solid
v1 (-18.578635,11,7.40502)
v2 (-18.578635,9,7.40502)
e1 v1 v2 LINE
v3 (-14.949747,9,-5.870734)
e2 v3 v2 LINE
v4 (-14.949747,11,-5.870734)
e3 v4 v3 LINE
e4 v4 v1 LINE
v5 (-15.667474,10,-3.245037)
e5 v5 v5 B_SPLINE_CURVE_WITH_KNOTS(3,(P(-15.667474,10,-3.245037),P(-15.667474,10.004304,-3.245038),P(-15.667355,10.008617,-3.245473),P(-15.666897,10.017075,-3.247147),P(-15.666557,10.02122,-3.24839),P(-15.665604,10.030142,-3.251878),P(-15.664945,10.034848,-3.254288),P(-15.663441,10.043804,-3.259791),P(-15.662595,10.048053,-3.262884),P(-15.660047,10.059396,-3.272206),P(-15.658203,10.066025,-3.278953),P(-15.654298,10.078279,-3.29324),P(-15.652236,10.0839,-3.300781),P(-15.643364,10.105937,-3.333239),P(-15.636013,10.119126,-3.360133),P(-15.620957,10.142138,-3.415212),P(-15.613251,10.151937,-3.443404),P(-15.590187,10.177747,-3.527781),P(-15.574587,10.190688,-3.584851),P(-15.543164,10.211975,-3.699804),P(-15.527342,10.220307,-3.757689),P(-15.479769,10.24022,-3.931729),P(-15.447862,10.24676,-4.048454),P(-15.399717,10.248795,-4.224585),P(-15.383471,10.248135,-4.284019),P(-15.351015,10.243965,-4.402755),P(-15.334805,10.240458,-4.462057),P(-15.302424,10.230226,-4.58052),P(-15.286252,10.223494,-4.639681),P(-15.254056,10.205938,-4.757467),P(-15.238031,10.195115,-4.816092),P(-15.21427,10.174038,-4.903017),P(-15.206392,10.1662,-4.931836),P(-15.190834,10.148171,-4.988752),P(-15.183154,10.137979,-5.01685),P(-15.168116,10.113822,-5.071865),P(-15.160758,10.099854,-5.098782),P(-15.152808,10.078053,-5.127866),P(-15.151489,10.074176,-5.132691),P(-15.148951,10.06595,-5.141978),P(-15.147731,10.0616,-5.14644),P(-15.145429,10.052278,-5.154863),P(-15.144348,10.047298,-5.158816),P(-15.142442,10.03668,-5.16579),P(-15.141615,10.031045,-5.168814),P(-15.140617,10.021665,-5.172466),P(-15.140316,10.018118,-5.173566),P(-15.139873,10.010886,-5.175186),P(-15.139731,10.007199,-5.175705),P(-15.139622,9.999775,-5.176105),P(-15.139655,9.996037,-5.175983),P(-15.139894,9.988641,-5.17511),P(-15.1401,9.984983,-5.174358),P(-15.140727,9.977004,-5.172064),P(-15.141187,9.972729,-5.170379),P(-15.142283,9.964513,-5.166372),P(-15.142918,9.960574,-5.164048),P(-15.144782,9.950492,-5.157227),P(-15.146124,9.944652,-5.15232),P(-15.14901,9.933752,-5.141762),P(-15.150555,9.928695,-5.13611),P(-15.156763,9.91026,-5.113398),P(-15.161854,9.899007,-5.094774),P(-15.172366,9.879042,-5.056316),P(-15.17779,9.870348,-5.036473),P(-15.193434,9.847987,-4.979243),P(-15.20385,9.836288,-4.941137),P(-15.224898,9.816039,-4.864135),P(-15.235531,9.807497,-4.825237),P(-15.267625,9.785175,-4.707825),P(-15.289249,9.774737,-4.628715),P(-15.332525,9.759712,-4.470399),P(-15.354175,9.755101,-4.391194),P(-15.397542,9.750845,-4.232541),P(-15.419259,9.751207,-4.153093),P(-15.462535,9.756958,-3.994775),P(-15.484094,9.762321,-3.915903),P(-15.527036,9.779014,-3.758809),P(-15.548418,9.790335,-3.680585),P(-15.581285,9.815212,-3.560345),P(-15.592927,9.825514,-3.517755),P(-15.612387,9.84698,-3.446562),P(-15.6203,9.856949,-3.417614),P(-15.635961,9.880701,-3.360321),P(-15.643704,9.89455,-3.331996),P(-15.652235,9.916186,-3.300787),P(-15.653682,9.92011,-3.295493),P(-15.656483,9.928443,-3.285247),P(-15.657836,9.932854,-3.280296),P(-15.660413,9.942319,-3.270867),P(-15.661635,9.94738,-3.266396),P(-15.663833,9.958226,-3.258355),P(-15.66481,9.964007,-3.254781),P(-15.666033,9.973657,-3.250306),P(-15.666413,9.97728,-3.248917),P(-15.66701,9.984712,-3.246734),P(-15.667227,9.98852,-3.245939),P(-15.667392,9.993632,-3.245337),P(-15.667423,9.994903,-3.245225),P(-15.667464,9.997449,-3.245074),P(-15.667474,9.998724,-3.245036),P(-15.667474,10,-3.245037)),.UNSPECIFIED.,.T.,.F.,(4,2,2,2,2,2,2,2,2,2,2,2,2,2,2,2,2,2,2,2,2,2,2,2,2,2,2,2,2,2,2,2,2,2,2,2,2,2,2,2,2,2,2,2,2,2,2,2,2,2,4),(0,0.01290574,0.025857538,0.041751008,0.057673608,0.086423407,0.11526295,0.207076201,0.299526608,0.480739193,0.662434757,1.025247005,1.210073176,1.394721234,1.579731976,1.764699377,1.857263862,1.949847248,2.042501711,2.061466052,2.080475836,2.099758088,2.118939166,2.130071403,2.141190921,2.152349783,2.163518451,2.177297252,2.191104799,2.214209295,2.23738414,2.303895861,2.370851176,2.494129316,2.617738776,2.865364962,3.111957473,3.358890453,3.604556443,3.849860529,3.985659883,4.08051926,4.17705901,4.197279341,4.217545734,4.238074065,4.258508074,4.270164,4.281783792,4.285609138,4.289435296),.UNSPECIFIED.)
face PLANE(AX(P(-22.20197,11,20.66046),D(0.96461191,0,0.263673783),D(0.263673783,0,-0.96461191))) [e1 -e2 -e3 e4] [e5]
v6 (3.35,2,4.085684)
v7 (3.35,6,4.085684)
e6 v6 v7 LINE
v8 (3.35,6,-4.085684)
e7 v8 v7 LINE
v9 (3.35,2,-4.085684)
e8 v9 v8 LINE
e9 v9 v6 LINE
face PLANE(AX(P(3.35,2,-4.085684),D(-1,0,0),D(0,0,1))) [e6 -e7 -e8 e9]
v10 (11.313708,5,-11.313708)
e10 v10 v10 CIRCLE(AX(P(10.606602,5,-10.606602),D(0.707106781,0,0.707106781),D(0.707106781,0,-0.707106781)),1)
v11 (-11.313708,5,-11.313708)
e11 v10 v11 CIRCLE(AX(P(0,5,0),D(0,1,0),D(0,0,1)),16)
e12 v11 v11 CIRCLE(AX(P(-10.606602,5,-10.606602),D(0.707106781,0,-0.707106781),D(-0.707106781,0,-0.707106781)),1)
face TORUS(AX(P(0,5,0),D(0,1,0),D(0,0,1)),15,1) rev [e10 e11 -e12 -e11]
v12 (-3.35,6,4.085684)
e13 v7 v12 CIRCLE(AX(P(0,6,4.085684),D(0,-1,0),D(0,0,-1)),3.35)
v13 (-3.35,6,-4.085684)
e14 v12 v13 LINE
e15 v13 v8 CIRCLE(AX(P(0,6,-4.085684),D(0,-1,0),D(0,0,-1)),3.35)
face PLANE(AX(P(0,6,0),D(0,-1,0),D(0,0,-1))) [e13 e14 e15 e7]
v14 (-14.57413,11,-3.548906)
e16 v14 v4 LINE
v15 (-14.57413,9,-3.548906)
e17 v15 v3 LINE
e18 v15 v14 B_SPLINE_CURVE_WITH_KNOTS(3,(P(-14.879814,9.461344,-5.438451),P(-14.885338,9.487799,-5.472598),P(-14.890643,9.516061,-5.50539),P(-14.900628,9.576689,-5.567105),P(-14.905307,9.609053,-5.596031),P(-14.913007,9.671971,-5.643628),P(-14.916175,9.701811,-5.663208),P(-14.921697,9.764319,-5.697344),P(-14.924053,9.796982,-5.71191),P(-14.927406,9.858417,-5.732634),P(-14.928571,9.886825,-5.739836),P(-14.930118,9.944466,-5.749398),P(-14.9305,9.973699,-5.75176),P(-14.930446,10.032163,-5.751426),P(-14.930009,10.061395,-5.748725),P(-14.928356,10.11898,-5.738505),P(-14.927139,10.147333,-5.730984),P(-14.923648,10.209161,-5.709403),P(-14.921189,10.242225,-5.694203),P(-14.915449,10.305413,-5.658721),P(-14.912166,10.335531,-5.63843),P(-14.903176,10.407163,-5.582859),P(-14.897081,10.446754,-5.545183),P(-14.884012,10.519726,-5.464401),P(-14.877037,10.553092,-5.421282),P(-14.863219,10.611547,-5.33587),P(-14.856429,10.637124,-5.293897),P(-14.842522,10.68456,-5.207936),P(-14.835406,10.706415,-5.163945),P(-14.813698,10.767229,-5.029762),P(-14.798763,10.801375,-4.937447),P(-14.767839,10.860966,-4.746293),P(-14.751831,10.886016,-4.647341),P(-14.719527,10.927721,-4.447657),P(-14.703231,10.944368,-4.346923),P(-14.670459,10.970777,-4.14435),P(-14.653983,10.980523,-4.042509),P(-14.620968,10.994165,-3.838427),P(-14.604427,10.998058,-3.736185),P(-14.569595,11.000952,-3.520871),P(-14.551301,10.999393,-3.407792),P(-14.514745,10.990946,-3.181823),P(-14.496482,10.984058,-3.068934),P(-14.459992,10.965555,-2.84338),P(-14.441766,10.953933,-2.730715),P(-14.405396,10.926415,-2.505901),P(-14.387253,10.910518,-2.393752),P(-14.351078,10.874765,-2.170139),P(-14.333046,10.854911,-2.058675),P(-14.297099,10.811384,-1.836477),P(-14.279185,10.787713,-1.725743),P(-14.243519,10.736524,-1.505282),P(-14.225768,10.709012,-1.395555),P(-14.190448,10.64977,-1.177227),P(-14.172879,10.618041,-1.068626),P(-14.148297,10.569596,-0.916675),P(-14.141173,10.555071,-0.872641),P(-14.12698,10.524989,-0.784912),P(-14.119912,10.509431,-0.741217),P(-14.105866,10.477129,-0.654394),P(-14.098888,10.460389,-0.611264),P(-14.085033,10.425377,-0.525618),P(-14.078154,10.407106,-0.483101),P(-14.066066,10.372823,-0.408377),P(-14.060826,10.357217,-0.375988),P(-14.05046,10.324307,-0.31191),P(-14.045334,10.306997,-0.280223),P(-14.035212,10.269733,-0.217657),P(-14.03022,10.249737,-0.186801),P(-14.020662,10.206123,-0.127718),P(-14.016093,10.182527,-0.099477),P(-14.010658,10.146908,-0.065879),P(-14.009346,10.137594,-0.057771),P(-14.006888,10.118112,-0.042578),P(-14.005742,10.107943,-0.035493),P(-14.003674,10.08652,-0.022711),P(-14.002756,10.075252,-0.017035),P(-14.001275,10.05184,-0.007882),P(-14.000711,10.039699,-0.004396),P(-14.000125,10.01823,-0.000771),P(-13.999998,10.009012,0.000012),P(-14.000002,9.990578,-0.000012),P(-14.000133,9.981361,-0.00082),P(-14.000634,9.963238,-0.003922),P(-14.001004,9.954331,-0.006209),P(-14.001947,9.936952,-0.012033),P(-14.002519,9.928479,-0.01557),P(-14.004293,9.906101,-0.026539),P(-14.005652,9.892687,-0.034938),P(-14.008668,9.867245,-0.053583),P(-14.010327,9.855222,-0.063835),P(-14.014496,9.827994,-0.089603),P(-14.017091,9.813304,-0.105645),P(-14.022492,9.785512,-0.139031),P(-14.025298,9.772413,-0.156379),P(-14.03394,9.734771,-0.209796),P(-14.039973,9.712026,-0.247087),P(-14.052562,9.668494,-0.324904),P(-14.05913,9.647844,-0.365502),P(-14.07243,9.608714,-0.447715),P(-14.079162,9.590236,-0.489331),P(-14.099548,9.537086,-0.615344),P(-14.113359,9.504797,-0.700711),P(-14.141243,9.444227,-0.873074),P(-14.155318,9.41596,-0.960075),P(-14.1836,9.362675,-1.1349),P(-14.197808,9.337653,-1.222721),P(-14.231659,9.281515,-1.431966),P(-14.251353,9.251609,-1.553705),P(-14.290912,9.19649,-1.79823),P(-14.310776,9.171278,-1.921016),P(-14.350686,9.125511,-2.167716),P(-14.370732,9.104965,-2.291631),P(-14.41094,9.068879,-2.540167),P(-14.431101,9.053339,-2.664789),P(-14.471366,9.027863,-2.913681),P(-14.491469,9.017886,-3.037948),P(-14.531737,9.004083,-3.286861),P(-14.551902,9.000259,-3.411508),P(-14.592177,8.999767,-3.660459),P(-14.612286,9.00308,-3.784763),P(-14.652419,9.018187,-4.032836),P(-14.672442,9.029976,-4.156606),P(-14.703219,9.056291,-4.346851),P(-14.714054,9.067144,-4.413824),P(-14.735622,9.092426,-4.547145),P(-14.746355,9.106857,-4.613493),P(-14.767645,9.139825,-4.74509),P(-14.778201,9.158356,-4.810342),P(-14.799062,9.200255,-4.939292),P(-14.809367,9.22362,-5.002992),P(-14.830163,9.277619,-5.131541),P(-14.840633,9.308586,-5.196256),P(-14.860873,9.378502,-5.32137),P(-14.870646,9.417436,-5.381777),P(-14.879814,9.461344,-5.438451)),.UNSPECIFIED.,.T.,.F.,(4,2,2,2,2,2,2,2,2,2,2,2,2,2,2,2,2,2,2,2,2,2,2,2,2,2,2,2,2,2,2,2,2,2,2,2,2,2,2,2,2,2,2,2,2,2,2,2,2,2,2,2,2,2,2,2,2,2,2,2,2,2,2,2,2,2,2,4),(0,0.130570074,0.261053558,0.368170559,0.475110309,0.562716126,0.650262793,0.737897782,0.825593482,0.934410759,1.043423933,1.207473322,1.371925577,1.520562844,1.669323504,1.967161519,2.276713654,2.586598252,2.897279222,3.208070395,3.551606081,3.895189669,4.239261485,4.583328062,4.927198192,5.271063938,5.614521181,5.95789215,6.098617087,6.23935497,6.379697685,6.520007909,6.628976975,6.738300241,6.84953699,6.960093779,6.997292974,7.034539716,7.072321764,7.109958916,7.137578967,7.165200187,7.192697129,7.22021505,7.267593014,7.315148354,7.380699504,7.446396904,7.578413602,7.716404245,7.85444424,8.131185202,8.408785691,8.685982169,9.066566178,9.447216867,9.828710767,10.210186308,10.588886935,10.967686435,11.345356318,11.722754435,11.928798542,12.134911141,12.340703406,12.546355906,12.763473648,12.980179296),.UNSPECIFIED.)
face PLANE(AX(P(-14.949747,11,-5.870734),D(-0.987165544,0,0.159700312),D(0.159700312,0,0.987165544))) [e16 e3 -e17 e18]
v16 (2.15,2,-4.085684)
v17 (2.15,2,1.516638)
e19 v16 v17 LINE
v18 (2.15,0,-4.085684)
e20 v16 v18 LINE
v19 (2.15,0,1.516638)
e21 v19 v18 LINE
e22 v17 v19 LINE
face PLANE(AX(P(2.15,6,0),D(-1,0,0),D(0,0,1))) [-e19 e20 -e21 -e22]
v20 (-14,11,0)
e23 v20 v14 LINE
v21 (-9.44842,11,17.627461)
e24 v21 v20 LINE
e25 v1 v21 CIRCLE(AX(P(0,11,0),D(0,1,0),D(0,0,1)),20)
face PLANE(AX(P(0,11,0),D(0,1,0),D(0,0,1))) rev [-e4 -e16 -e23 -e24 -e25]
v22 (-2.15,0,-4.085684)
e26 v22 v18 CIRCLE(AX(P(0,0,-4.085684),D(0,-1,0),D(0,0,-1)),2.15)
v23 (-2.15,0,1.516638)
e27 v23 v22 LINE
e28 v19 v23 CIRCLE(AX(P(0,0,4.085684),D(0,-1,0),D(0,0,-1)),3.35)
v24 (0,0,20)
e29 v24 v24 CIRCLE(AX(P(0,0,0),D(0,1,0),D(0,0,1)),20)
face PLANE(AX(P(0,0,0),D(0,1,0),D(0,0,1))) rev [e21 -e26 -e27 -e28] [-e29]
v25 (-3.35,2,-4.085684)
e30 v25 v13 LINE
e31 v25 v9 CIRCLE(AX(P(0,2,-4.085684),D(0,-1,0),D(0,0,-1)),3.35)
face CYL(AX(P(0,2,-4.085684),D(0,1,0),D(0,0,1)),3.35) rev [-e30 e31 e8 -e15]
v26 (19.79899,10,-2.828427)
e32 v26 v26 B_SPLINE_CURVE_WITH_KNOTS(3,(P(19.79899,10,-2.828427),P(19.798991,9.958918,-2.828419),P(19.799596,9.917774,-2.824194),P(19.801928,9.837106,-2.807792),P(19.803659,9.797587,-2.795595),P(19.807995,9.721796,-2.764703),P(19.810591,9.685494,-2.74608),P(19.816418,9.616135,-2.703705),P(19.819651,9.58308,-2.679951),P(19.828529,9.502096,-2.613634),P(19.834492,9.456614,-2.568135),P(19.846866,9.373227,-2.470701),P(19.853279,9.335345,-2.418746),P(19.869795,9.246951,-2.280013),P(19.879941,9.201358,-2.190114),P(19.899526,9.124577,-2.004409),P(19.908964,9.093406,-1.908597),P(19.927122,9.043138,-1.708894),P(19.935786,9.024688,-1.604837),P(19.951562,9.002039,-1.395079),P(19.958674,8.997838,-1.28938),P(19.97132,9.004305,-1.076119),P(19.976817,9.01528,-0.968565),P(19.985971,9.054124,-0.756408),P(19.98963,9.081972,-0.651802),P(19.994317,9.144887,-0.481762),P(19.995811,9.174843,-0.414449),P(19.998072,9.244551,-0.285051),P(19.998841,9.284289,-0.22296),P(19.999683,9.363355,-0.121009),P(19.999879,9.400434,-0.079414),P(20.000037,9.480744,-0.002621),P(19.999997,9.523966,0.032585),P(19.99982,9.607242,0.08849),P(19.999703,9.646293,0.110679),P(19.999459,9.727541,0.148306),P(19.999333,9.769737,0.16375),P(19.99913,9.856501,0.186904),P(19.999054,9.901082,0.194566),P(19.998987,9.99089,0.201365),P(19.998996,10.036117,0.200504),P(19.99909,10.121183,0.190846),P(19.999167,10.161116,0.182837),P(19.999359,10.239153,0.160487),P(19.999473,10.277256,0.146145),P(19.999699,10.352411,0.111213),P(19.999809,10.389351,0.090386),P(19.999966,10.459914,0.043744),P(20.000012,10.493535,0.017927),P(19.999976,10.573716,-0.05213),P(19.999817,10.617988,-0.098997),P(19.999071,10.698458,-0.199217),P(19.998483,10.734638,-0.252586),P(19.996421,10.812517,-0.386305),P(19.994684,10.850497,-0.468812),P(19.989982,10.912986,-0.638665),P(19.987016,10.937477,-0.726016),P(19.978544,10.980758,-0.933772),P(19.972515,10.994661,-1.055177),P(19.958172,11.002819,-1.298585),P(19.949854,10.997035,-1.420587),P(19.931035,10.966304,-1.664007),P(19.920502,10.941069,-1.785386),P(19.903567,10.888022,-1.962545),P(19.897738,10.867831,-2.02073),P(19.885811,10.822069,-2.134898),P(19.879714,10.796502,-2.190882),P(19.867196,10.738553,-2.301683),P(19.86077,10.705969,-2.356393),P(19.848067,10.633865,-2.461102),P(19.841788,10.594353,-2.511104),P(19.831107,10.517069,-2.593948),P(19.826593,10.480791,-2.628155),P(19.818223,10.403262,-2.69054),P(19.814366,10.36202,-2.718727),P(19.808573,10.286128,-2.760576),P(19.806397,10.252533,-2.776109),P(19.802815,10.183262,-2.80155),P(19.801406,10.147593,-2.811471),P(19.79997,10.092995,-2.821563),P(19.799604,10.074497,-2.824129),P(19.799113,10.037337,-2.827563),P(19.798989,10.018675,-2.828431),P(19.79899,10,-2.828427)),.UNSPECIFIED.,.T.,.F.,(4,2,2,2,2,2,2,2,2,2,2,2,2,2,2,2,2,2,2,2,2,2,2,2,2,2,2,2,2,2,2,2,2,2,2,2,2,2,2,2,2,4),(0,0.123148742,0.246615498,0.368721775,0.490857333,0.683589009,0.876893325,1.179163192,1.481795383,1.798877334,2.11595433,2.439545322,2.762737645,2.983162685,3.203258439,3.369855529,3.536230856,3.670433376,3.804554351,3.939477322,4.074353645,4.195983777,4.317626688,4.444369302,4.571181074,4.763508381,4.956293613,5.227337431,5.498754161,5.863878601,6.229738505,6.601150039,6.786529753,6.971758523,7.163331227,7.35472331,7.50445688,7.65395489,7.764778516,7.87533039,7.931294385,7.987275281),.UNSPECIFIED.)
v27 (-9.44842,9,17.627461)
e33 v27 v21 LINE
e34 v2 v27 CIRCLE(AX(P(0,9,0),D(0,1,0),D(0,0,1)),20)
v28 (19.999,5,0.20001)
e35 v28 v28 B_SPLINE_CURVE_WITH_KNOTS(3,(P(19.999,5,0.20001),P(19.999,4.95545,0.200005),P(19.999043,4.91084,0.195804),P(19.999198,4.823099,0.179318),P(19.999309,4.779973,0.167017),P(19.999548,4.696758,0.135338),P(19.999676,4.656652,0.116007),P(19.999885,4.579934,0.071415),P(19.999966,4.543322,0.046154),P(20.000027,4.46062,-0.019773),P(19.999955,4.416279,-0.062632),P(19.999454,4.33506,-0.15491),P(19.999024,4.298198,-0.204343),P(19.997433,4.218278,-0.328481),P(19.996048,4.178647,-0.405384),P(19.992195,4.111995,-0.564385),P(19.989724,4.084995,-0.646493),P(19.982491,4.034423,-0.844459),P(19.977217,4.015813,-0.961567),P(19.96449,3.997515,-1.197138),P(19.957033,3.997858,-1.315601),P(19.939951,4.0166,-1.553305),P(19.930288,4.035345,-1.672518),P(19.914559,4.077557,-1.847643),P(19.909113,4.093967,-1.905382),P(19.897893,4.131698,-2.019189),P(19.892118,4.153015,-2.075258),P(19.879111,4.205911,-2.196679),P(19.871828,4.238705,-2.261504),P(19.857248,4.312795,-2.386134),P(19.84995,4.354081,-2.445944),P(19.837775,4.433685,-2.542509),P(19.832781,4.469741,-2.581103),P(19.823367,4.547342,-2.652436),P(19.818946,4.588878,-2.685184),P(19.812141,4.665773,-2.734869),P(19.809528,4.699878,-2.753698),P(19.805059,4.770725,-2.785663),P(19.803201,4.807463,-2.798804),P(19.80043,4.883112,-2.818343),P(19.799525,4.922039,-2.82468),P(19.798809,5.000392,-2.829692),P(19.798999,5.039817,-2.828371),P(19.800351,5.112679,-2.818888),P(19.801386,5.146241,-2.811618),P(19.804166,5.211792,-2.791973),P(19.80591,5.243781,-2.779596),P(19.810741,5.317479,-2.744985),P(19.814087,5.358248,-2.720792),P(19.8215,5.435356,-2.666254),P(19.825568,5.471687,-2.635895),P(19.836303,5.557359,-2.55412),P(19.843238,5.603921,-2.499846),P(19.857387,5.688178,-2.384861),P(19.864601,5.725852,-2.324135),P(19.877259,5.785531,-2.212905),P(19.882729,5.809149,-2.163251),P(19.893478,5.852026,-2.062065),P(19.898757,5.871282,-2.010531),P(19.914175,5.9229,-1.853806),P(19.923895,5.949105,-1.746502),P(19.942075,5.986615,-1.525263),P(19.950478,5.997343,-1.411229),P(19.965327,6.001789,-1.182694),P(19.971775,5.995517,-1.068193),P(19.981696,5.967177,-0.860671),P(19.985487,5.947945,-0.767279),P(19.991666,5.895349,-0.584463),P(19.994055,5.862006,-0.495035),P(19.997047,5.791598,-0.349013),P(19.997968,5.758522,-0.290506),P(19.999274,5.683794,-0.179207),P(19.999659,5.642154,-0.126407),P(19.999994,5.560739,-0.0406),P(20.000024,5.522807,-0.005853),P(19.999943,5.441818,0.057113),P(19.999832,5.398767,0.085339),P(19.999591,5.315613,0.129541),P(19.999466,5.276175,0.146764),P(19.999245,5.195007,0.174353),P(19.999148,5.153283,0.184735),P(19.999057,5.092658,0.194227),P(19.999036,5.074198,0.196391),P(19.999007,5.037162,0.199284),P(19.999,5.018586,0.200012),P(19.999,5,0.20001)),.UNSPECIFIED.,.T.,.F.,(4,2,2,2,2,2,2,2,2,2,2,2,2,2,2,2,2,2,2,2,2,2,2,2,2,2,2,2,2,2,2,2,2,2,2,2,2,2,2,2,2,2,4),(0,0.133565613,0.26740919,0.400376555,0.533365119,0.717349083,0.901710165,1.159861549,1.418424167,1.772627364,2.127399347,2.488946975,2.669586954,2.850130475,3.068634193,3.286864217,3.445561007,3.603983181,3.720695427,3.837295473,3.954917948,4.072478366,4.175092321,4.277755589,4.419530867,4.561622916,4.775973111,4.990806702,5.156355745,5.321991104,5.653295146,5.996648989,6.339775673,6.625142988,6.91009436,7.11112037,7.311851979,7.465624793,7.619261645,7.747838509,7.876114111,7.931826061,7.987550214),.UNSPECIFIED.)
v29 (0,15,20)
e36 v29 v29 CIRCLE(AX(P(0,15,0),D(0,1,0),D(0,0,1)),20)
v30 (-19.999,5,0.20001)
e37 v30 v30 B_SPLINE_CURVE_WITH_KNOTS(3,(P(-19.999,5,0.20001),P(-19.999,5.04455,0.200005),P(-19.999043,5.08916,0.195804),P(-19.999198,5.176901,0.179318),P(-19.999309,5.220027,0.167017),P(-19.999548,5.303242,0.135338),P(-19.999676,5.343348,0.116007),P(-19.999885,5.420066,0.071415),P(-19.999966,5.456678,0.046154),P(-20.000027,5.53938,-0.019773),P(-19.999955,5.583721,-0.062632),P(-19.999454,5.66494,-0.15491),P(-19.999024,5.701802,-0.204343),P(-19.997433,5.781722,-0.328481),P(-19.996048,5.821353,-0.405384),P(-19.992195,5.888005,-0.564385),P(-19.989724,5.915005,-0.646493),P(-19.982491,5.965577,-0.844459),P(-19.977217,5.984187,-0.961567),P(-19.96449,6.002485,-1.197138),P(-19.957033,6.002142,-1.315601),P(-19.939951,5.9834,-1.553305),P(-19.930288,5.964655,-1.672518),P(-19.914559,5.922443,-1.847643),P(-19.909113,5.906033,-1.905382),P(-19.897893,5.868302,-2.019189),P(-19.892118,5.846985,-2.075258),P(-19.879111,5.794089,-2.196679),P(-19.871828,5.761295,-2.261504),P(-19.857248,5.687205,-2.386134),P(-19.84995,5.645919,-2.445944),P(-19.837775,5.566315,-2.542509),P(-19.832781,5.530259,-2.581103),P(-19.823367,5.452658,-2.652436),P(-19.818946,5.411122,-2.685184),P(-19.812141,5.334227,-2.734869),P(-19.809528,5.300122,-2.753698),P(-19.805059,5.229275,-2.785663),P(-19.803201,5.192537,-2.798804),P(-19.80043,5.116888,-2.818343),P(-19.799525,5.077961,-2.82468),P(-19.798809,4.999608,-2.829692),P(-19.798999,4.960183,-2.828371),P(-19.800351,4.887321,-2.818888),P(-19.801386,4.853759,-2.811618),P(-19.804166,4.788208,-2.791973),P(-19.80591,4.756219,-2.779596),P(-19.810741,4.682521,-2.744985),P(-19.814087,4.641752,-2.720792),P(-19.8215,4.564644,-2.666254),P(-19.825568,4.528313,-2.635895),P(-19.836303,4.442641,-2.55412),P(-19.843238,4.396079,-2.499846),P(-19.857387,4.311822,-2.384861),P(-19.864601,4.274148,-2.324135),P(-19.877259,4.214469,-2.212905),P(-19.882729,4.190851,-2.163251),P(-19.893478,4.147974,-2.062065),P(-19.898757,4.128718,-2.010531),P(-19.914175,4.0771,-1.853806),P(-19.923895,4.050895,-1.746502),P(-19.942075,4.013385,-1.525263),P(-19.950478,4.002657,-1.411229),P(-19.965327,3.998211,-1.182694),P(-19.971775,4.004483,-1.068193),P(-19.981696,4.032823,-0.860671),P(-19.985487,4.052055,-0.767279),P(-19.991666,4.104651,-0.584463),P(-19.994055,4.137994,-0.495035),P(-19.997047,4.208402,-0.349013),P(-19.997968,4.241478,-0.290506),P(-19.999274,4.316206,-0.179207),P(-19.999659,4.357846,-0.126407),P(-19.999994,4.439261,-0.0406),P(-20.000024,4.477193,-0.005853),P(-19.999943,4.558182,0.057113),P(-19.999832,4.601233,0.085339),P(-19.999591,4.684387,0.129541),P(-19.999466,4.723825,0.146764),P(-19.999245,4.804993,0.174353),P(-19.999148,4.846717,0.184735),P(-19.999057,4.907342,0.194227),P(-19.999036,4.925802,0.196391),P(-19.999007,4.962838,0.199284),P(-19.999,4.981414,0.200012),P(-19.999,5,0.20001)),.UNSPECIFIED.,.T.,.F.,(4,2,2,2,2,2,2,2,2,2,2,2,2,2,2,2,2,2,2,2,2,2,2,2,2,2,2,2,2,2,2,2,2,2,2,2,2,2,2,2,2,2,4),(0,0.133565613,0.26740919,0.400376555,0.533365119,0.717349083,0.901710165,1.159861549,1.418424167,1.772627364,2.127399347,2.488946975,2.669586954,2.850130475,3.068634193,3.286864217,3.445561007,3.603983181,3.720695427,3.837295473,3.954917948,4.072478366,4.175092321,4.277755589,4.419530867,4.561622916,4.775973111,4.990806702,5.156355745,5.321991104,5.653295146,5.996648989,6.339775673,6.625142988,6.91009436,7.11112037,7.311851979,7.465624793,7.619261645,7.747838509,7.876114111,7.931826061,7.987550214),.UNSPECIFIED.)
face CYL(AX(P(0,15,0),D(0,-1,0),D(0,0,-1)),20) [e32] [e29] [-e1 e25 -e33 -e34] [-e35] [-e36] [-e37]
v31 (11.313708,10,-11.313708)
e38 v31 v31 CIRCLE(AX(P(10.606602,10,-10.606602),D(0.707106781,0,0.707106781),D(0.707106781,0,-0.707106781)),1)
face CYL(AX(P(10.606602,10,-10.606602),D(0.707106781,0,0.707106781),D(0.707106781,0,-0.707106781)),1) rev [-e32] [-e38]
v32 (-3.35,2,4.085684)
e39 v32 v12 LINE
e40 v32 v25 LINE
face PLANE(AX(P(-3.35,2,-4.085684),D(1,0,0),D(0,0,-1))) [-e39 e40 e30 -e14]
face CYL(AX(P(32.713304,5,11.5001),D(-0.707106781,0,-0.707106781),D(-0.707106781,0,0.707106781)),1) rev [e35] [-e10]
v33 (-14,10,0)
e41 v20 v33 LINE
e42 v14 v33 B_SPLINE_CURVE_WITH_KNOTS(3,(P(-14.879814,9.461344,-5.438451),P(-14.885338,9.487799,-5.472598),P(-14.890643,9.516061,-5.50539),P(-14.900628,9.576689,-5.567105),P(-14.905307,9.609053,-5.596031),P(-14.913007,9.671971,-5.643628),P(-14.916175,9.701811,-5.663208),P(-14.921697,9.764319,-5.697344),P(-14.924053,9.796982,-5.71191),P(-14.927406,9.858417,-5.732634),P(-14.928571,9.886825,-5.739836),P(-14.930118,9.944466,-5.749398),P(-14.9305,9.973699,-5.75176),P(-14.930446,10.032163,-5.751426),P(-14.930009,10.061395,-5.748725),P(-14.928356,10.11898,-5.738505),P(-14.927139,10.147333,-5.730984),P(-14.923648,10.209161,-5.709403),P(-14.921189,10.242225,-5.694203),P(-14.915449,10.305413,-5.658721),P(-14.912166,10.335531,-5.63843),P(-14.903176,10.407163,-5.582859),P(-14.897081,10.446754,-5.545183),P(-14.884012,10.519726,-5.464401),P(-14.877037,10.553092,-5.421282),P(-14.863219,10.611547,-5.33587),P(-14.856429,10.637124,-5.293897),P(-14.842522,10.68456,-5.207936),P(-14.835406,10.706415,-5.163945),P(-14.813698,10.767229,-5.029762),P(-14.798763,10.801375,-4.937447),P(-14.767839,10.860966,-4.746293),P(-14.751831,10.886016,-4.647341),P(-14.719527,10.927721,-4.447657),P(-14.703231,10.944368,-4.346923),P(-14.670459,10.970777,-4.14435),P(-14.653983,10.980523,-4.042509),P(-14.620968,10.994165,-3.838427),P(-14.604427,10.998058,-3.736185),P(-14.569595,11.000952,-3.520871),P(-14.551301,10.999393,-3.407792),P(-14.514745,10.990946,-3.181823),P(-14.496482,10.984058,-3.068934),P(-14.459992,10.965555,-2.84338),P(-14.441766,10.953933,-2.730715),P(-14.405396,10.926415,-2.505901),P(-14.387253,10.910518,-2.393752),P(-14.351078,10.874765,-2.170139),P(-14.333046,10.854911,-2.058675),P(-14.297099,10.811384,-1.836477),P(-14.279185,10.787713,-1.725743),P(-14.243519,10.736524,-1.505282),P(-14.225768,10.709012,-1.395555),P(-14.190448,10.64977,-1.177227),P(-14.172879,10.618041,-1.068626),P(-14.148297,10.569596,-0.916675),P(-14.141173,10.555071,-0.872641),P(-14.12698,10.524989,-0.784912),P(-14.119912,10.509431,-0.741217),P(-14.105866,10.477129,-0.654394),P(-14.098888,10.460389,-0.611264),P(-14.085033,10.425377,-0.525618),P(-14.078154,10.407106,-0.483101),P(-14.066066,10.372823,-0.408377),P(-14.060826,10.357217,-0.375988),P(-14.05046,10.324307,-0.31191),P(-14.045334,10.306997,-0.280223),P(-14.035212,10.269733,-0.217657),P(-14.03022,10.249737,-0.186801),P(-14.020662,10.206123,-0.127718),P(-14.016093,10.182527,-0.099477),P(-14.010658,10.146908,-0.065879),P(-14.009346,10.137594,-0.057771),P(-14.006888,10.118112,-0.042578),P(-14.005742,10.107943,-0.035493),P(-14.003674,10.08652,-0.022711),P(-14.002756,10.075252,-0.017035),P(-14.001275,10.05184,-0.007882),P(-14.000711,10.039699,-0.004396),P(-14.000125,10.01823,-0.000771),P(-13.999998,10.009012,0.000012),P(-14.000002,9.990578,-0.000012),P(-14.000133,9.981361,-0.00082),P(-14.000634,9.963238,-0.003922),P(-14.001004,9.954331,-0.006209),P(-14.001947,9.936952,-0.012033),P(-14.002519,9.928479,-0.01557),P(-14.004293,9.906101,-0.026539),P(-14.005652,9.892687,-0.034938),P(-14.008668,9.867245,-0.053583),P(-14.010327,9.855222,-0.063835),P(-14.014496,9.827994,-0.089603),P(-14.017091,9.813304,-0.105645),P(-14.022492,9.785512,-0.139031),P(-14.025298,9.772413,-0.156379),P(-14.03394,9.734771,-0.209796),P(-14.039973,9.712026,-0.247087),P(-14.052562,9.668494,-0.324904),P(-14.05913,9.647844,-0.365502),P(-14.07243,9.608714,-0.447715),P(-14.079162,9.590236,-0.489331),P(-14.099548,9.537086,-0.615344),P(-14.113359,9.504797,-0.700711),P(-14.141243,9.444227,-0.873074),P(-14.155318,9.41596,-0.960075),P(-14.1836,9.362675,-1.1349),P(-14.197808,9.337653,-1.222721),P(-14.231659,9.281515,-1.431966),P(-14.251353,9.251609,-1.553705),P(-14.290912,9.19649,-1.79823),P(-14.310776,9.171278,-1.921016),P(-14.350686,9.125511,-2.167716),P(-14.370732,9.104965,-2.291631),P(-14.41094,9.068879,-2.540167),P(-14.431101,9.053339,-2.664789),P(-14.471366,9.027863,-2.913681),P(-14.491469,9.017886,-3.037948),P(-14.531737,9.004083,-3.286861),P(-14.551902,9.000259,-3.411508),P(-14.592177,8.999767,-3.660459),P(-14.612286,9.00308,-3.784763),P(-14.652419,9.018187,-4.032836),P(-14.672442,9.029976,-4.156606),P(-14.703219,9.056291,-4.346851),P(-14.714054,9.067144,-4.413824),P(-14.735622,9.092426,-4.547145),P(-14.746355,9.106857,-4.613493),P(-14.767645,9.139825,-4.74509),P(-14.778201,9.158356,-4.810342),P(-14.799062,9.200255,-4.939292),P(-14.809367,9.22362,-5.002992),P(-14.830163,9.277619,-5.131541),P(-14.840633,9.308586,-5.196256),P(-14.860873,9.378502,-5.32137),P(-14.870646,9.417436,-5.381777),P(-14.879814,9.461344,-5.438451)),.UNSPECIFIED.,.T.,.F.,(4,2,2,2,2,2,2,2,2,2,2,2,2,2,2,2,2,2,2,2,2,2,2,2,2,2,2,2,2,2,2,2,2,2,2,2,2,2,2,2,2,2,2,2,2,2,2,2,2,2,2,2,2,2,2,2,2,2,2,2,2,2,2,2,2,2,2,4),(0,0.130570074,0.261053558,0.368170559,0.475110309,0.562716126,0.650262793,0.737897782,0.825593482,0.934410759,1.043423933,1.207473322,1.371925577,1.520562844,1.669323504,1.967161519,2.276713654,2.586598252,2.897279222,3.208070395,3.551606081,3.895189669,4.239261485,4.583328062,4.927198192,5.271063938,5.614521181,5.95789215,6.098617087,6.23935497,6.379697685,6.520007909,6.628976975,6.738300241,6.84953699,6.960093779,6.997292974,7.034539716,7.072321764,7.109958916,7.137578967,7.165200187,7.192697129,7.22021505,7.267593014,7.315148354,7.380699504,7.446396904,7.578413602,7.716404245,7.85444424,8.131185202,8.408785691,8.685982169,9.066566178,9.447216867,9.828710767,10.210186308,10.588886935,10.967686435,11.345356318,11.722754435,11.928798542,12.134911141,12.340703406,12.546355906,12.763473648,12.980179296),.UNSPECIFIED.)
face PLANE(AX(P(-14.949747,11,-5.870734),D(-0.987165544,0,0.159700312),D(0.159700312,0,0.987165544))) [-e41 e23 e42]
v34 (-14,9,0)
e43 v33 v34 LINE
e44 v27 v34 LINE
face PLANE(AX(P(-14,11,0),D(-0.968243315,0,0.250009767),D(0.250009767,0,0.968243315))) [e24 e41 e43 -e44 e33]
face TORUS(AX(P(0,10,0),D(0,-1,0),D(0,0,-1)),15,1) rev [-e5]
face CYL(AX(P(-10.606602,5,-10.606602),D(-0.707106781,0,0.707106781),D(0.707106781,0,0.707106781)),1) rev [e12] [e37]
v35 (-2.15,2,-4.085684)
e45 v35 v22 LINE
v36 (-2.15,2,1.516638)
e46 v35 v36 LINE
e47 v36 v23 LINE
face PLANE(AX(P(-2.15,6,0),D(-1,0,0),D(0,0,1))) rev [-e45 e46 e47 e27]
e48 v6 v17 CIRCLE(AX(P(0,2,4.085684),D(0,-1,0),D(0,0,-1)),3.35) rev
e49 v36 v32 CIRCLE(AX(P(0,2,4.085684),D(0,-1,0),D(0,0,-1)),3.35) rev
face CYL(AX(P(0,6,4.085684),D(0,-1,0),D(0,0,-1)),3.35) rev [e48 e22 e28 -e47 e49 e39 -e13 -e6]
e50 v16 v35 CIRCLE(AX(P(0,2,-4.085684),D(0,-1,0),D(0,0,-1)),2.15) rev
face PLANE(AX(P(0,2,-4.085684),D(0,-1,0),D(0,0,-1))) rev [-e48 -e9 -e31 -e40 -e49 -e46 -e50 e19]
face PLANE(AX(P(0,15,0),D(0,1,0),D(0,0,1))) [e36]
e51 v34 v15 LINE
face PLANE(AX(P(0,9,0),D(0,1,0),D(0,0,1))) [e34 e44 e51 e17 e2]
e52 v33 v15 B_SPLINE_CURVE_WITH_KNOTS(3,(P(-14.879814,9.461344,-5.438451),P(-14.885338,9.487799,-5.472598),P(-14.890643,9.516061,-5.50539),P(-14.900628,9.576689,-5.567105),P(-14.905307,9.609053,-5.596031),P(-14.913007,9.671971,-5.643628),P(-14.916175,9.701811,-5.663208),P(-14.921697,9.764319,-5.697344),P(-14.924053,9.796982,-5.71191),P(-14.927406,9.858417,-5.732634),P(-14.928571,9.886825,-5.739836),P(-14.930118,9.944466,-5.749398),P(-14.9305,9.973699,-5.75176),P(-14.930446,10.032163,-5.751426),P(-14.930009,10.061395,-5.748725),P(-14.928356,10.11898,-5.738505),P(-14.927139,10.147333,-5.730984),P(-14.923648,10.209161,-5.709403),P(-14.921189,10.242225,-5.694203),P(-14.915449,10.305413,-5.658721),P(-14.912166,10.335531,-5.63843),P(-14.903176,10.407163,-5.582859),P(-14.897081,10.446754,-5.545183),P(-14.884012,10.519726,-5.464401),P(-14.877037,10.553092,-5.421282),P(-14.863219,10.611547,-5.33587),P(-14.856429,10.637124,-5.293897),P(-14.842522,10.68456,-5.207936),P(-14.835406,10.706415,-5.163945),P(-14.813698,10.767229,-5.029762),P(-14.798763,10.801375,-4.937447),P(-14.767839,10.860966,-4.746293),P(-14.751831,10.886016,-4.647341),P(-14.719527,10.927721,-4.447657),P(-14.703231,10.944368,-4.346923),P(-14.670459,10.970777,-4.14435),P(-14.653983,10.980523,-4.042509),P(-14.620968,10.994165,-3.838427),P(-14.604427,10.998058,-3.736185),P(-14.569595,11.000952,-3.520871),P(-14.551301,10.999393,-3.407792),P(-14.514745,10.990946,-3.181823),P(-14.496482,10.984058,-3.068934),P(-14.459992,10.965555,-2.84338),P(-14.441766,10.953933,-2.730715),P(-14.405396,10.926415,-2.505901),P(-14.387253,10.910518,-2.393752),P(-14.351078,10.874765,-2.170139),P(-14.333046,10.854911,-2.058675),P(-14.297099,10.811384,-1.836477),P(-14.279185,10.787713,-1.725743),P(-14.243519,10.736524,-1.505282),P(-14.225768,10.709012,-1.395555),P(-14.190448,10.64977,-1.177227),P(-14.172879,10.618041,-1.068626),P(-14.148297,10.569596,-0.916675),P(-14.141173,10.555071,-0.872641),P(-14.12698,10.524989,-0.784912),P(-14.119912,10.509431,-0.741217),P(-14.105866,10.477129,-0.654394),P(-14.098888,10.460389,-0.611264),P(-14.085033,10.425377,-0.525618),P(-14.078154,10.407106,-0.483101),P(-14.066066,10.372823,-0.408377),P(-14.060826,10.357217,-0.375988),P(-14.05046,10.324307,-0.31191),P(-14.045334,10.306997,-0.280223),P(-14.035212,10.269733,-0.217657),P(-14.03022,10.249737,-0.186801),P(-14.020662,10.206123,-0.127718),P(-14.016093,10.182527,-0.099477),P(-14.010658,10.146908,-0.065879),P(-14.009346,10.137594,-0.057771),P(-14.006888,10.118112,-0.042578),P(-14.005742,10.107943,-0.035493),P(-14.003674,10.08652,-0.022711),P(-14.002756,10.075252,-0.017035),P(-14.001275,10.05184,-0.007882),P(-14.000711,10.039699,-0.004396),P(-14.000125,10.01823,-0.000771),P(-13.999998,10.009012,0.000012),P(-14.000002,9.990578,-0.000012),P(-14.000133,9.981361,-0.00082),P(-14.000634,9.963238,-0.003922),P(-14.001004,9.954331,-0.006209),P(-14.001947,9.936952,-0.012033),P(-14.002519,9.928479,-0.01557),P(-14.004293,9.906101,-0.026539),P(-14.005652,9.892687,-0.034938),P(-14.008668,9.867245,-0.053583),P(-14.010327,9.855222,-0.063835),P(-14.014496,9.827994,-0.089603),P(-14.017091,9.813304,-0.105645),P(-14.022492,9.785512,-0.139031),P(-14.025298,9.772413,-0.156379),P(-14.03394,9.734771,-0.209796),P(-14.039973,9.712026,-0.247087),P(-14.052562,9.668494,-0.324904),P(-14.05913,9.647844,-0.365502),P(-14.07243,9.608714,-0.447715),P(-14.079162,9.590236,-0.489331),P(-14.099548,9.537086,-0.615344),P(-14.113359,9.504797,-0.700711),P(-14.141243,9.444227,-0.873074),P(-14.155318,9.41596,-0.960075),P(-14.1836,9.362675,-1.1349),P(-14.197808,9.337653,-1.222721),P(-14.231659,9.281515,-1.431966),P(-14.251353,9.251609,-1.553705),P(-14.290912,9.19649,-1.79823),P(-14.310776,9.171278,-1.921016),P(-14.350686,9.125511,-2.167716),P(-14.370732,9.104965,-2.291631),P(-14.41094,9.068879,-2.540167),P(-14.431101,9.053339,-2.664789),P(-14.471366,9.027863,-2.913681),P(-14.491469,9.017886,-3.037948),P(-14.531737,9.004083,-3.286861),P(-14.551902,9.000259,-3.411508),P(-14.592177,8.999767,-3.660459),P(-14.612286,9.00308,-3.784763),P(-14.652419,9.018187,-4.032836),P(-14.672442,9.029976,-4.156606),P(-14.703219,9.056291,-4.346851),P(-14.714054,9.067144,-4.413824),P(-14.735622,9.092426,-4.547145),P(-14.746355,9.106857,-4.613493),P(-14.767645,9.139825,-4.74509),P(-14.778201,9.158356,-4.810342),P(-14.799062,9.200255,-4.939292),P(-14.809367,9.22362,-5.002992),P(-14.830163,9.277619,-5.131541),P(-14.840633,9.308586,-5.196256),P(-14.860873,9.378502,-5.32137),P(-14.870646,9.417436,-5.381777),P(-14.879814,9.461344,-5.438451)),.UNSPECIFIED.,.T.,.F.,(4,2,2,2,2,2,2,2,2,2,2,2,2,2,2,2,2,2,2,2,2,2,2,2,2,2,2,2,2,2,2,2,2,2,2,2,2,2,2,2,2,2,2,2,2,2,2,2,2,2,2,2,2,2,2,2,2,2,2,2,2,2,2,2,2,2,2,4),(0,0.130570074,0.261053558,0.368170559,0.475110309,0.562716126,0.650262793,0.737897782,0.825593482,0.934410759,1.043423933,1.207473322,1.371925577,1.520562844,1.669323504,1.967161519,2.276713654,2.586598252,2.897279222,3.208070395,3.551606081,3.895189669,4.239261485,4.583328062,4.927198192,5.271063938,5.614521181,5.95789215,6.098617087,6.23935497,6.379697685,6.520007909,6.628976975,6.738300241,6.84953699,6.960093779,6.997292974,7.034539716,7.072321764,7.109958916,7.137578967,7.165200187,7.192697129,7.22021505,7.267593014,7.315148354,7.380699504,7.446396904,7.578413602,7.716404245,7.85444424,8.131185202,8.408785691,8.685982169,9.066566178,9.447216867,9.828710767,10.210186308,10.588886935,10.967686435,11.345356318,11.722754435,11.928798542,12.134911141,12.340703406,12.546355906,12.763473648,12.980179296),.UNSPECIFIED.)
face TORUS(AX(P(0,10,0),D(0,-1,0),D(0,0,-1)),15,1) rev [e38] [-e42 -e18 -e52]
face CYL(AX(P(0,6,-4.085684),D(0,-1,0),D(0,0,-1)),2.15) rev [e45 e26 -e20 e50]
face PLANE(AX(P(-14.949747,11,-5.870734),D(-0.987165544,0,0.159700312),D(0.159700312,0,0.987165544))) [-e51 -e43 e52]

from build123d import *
from build123d.topology import SkipClean

# Parameters (mm, degrees)
SKETCH1_R               = 20
BOSS_EXTRUDE1_DEPTH     = 15
CUT_EXTRUDE1_DEPTH      = 6
CUT_EXTRUDE2_START      = 4
CUT_EXTRUDE2_DEPTH      = 4
CUT_SWEEP1_PROFILE_R    = 1
CUT_SWEEP2_PROFILE_R    = 1
CUT_EXTRUDE3_DEPTH      = 1
CUT_EXTRUDE3_DEPTH_BACK = 1


with BuildPart() as part:
    # Sketch1 → Boss-Extrude1 (new body)
    with BuildSketch(Plane(origin=(0, 0, 0), x_dir=(1, 0, 0), z_dir=(0, 1, 0))):
        Circle(SKETCH1_R)
    extrude(amount=BOSS_EXTRUDE1_DEPTH)

    # Sketch2 → Cut-Extrude1 (cut)
    with BuildSketch(Plane.XZ):
        with BuildLine():
            Line((-2.15, 1.516637572), (-2.15, -4.085684088))
            ThreePointArc((-2.15, -4.085684088), (0, -6.235684088), (2.15, -4.085684088))
            Line((2.15, -4.085684088), (2.15, 1.516637572))
            ThreePointArc((2.15, 1.516637572), (0, 7.435684088), (-2.15, 1.516637572))
        make_face()
    extrude(amount=-CUT_EXTRUDE1_DEPTH, mode=Mode.SUBTRACT)

    # Sketch3 → Cut-Extrude2 (cut)
    with SkipClean():  # the faces are left unmerged after this step: merging them gives an invalid solid
        with BuildSketch(Plane.XZ.offset(-6).offset(CUT_EXTRUDE2_START)):
            with BuildLine():
                Line((-3.35, -4.085684088), (-3.35, 4.085684088))
                ThreePointArc((-3.35, 4.085684088), (0, 7.435684088), (3.35, 4.085684088))
                Line((3.35, 4.085684088), (3.35, -4.085684088))
                ThreePointArc((3.35, -4.085684088), (0, -7.435684088), (-3.35, -4.085684088))
            make_face()
        extrude(amount=-CUT_EXTRUDE2_DEPTH, mode=Mode.SUBTRACT)

    # Cut-Sweep1: sweep along a path in Sketch6
    with SkipClean():  # the faces are left unmerged after this step: merging them gives an invalid solid
        with BuildLine(Plane(origin=(0, 10, 0), x_dir=(1, 0, 0), z_dir=(0, 1, 0))) as cut_sweep1_path:
            Line((32.713303623, -11.500100188), (10.606601718, 10.606601718))
            ThreePointArc((10.606601718, 10.606601718), (-5.740251485, 13.858192988), (-15, 0))
            Line((-15, 0), (-15, -54.761265519))
        # Cut-Sweep1 profile (on start of the path) → Cut-Sweep1 (sweep, cut)
        with BuildSketch(Plane(origin=(32.713303623, 10, 11.500100188), x_dir=(-0.7071067811865515, 0, 0.7071067811865437), z_dir=(-0.7071067811865437, 0, -0.7071067811865515))):
            Circle(CUT_SWEEP1_PROFILE_R)
        sweep(path=cut_sweep1_path.line, mode=Mode.SUBTRACT)

    # Cut-Sweep2: sweep along a path in Sketch5
    with SkipClean():  # the faces are left unmerged after this step: merging them gives an invalid solid
        with BuildLine(Plane(origin=(0, 5, 0), x_dir=(-1, 0, 0), z_dir=(0, -1, 0))) as cut_sweep2_path:
            Line((-32.713303623, -11.500100188), (-10.606601718, 10.606601718))
            ThreePointArc((-10.606601718, 10.606601718), (0, 15), (10.606601718, 10.606601718))
            Line((10.606601718, 10.606601718), (41.577001277, -20.363797841))
        # Cut-Sweep2 profile (on start of the path) → Cut-Sweep2 (sweep, cut)
        with BuildSketch(Plane(origin=(32.713303623, 5, 11.500100188), x_dir=(-0.7071067811865515, 0, 0.7071067811865437), z_dir=(-0.7071067811865437, 0, -0.7071067811865515))):
            Circle(CUT_SWEEP2_PROFILE_R)
        sweep(path=cut_sweep2_path.line, mode=Mode.SUBTRACT)

    # Sketch19 → Cut-Extrude3 (cut, two sides: drawn at the far end of the back side and taken through both)
    with SkipClean():  # the faces are left unmerged after this step: merging them gives an invalid solid
        with BuildSketch(Plane(origin=(0, 10, 0), x_dir=(1, 0, 0), z_dir=(0, 1, 0)).offset(-CUT_EXTRUDE3_DEPTH_BACK)):
            Polygon((-14.949747468, 5.870733518), (-14, 0), (-8.665269788, -20.660460329), (-22.201970025, -20.660460329), align=None)
        extrude(amount=CUT_EXTRUDE3_DEPTH + CUT_EXTRUDE3_DEPTH_BACK, mode=Mode.SUBTRACT)


solid = part.part
